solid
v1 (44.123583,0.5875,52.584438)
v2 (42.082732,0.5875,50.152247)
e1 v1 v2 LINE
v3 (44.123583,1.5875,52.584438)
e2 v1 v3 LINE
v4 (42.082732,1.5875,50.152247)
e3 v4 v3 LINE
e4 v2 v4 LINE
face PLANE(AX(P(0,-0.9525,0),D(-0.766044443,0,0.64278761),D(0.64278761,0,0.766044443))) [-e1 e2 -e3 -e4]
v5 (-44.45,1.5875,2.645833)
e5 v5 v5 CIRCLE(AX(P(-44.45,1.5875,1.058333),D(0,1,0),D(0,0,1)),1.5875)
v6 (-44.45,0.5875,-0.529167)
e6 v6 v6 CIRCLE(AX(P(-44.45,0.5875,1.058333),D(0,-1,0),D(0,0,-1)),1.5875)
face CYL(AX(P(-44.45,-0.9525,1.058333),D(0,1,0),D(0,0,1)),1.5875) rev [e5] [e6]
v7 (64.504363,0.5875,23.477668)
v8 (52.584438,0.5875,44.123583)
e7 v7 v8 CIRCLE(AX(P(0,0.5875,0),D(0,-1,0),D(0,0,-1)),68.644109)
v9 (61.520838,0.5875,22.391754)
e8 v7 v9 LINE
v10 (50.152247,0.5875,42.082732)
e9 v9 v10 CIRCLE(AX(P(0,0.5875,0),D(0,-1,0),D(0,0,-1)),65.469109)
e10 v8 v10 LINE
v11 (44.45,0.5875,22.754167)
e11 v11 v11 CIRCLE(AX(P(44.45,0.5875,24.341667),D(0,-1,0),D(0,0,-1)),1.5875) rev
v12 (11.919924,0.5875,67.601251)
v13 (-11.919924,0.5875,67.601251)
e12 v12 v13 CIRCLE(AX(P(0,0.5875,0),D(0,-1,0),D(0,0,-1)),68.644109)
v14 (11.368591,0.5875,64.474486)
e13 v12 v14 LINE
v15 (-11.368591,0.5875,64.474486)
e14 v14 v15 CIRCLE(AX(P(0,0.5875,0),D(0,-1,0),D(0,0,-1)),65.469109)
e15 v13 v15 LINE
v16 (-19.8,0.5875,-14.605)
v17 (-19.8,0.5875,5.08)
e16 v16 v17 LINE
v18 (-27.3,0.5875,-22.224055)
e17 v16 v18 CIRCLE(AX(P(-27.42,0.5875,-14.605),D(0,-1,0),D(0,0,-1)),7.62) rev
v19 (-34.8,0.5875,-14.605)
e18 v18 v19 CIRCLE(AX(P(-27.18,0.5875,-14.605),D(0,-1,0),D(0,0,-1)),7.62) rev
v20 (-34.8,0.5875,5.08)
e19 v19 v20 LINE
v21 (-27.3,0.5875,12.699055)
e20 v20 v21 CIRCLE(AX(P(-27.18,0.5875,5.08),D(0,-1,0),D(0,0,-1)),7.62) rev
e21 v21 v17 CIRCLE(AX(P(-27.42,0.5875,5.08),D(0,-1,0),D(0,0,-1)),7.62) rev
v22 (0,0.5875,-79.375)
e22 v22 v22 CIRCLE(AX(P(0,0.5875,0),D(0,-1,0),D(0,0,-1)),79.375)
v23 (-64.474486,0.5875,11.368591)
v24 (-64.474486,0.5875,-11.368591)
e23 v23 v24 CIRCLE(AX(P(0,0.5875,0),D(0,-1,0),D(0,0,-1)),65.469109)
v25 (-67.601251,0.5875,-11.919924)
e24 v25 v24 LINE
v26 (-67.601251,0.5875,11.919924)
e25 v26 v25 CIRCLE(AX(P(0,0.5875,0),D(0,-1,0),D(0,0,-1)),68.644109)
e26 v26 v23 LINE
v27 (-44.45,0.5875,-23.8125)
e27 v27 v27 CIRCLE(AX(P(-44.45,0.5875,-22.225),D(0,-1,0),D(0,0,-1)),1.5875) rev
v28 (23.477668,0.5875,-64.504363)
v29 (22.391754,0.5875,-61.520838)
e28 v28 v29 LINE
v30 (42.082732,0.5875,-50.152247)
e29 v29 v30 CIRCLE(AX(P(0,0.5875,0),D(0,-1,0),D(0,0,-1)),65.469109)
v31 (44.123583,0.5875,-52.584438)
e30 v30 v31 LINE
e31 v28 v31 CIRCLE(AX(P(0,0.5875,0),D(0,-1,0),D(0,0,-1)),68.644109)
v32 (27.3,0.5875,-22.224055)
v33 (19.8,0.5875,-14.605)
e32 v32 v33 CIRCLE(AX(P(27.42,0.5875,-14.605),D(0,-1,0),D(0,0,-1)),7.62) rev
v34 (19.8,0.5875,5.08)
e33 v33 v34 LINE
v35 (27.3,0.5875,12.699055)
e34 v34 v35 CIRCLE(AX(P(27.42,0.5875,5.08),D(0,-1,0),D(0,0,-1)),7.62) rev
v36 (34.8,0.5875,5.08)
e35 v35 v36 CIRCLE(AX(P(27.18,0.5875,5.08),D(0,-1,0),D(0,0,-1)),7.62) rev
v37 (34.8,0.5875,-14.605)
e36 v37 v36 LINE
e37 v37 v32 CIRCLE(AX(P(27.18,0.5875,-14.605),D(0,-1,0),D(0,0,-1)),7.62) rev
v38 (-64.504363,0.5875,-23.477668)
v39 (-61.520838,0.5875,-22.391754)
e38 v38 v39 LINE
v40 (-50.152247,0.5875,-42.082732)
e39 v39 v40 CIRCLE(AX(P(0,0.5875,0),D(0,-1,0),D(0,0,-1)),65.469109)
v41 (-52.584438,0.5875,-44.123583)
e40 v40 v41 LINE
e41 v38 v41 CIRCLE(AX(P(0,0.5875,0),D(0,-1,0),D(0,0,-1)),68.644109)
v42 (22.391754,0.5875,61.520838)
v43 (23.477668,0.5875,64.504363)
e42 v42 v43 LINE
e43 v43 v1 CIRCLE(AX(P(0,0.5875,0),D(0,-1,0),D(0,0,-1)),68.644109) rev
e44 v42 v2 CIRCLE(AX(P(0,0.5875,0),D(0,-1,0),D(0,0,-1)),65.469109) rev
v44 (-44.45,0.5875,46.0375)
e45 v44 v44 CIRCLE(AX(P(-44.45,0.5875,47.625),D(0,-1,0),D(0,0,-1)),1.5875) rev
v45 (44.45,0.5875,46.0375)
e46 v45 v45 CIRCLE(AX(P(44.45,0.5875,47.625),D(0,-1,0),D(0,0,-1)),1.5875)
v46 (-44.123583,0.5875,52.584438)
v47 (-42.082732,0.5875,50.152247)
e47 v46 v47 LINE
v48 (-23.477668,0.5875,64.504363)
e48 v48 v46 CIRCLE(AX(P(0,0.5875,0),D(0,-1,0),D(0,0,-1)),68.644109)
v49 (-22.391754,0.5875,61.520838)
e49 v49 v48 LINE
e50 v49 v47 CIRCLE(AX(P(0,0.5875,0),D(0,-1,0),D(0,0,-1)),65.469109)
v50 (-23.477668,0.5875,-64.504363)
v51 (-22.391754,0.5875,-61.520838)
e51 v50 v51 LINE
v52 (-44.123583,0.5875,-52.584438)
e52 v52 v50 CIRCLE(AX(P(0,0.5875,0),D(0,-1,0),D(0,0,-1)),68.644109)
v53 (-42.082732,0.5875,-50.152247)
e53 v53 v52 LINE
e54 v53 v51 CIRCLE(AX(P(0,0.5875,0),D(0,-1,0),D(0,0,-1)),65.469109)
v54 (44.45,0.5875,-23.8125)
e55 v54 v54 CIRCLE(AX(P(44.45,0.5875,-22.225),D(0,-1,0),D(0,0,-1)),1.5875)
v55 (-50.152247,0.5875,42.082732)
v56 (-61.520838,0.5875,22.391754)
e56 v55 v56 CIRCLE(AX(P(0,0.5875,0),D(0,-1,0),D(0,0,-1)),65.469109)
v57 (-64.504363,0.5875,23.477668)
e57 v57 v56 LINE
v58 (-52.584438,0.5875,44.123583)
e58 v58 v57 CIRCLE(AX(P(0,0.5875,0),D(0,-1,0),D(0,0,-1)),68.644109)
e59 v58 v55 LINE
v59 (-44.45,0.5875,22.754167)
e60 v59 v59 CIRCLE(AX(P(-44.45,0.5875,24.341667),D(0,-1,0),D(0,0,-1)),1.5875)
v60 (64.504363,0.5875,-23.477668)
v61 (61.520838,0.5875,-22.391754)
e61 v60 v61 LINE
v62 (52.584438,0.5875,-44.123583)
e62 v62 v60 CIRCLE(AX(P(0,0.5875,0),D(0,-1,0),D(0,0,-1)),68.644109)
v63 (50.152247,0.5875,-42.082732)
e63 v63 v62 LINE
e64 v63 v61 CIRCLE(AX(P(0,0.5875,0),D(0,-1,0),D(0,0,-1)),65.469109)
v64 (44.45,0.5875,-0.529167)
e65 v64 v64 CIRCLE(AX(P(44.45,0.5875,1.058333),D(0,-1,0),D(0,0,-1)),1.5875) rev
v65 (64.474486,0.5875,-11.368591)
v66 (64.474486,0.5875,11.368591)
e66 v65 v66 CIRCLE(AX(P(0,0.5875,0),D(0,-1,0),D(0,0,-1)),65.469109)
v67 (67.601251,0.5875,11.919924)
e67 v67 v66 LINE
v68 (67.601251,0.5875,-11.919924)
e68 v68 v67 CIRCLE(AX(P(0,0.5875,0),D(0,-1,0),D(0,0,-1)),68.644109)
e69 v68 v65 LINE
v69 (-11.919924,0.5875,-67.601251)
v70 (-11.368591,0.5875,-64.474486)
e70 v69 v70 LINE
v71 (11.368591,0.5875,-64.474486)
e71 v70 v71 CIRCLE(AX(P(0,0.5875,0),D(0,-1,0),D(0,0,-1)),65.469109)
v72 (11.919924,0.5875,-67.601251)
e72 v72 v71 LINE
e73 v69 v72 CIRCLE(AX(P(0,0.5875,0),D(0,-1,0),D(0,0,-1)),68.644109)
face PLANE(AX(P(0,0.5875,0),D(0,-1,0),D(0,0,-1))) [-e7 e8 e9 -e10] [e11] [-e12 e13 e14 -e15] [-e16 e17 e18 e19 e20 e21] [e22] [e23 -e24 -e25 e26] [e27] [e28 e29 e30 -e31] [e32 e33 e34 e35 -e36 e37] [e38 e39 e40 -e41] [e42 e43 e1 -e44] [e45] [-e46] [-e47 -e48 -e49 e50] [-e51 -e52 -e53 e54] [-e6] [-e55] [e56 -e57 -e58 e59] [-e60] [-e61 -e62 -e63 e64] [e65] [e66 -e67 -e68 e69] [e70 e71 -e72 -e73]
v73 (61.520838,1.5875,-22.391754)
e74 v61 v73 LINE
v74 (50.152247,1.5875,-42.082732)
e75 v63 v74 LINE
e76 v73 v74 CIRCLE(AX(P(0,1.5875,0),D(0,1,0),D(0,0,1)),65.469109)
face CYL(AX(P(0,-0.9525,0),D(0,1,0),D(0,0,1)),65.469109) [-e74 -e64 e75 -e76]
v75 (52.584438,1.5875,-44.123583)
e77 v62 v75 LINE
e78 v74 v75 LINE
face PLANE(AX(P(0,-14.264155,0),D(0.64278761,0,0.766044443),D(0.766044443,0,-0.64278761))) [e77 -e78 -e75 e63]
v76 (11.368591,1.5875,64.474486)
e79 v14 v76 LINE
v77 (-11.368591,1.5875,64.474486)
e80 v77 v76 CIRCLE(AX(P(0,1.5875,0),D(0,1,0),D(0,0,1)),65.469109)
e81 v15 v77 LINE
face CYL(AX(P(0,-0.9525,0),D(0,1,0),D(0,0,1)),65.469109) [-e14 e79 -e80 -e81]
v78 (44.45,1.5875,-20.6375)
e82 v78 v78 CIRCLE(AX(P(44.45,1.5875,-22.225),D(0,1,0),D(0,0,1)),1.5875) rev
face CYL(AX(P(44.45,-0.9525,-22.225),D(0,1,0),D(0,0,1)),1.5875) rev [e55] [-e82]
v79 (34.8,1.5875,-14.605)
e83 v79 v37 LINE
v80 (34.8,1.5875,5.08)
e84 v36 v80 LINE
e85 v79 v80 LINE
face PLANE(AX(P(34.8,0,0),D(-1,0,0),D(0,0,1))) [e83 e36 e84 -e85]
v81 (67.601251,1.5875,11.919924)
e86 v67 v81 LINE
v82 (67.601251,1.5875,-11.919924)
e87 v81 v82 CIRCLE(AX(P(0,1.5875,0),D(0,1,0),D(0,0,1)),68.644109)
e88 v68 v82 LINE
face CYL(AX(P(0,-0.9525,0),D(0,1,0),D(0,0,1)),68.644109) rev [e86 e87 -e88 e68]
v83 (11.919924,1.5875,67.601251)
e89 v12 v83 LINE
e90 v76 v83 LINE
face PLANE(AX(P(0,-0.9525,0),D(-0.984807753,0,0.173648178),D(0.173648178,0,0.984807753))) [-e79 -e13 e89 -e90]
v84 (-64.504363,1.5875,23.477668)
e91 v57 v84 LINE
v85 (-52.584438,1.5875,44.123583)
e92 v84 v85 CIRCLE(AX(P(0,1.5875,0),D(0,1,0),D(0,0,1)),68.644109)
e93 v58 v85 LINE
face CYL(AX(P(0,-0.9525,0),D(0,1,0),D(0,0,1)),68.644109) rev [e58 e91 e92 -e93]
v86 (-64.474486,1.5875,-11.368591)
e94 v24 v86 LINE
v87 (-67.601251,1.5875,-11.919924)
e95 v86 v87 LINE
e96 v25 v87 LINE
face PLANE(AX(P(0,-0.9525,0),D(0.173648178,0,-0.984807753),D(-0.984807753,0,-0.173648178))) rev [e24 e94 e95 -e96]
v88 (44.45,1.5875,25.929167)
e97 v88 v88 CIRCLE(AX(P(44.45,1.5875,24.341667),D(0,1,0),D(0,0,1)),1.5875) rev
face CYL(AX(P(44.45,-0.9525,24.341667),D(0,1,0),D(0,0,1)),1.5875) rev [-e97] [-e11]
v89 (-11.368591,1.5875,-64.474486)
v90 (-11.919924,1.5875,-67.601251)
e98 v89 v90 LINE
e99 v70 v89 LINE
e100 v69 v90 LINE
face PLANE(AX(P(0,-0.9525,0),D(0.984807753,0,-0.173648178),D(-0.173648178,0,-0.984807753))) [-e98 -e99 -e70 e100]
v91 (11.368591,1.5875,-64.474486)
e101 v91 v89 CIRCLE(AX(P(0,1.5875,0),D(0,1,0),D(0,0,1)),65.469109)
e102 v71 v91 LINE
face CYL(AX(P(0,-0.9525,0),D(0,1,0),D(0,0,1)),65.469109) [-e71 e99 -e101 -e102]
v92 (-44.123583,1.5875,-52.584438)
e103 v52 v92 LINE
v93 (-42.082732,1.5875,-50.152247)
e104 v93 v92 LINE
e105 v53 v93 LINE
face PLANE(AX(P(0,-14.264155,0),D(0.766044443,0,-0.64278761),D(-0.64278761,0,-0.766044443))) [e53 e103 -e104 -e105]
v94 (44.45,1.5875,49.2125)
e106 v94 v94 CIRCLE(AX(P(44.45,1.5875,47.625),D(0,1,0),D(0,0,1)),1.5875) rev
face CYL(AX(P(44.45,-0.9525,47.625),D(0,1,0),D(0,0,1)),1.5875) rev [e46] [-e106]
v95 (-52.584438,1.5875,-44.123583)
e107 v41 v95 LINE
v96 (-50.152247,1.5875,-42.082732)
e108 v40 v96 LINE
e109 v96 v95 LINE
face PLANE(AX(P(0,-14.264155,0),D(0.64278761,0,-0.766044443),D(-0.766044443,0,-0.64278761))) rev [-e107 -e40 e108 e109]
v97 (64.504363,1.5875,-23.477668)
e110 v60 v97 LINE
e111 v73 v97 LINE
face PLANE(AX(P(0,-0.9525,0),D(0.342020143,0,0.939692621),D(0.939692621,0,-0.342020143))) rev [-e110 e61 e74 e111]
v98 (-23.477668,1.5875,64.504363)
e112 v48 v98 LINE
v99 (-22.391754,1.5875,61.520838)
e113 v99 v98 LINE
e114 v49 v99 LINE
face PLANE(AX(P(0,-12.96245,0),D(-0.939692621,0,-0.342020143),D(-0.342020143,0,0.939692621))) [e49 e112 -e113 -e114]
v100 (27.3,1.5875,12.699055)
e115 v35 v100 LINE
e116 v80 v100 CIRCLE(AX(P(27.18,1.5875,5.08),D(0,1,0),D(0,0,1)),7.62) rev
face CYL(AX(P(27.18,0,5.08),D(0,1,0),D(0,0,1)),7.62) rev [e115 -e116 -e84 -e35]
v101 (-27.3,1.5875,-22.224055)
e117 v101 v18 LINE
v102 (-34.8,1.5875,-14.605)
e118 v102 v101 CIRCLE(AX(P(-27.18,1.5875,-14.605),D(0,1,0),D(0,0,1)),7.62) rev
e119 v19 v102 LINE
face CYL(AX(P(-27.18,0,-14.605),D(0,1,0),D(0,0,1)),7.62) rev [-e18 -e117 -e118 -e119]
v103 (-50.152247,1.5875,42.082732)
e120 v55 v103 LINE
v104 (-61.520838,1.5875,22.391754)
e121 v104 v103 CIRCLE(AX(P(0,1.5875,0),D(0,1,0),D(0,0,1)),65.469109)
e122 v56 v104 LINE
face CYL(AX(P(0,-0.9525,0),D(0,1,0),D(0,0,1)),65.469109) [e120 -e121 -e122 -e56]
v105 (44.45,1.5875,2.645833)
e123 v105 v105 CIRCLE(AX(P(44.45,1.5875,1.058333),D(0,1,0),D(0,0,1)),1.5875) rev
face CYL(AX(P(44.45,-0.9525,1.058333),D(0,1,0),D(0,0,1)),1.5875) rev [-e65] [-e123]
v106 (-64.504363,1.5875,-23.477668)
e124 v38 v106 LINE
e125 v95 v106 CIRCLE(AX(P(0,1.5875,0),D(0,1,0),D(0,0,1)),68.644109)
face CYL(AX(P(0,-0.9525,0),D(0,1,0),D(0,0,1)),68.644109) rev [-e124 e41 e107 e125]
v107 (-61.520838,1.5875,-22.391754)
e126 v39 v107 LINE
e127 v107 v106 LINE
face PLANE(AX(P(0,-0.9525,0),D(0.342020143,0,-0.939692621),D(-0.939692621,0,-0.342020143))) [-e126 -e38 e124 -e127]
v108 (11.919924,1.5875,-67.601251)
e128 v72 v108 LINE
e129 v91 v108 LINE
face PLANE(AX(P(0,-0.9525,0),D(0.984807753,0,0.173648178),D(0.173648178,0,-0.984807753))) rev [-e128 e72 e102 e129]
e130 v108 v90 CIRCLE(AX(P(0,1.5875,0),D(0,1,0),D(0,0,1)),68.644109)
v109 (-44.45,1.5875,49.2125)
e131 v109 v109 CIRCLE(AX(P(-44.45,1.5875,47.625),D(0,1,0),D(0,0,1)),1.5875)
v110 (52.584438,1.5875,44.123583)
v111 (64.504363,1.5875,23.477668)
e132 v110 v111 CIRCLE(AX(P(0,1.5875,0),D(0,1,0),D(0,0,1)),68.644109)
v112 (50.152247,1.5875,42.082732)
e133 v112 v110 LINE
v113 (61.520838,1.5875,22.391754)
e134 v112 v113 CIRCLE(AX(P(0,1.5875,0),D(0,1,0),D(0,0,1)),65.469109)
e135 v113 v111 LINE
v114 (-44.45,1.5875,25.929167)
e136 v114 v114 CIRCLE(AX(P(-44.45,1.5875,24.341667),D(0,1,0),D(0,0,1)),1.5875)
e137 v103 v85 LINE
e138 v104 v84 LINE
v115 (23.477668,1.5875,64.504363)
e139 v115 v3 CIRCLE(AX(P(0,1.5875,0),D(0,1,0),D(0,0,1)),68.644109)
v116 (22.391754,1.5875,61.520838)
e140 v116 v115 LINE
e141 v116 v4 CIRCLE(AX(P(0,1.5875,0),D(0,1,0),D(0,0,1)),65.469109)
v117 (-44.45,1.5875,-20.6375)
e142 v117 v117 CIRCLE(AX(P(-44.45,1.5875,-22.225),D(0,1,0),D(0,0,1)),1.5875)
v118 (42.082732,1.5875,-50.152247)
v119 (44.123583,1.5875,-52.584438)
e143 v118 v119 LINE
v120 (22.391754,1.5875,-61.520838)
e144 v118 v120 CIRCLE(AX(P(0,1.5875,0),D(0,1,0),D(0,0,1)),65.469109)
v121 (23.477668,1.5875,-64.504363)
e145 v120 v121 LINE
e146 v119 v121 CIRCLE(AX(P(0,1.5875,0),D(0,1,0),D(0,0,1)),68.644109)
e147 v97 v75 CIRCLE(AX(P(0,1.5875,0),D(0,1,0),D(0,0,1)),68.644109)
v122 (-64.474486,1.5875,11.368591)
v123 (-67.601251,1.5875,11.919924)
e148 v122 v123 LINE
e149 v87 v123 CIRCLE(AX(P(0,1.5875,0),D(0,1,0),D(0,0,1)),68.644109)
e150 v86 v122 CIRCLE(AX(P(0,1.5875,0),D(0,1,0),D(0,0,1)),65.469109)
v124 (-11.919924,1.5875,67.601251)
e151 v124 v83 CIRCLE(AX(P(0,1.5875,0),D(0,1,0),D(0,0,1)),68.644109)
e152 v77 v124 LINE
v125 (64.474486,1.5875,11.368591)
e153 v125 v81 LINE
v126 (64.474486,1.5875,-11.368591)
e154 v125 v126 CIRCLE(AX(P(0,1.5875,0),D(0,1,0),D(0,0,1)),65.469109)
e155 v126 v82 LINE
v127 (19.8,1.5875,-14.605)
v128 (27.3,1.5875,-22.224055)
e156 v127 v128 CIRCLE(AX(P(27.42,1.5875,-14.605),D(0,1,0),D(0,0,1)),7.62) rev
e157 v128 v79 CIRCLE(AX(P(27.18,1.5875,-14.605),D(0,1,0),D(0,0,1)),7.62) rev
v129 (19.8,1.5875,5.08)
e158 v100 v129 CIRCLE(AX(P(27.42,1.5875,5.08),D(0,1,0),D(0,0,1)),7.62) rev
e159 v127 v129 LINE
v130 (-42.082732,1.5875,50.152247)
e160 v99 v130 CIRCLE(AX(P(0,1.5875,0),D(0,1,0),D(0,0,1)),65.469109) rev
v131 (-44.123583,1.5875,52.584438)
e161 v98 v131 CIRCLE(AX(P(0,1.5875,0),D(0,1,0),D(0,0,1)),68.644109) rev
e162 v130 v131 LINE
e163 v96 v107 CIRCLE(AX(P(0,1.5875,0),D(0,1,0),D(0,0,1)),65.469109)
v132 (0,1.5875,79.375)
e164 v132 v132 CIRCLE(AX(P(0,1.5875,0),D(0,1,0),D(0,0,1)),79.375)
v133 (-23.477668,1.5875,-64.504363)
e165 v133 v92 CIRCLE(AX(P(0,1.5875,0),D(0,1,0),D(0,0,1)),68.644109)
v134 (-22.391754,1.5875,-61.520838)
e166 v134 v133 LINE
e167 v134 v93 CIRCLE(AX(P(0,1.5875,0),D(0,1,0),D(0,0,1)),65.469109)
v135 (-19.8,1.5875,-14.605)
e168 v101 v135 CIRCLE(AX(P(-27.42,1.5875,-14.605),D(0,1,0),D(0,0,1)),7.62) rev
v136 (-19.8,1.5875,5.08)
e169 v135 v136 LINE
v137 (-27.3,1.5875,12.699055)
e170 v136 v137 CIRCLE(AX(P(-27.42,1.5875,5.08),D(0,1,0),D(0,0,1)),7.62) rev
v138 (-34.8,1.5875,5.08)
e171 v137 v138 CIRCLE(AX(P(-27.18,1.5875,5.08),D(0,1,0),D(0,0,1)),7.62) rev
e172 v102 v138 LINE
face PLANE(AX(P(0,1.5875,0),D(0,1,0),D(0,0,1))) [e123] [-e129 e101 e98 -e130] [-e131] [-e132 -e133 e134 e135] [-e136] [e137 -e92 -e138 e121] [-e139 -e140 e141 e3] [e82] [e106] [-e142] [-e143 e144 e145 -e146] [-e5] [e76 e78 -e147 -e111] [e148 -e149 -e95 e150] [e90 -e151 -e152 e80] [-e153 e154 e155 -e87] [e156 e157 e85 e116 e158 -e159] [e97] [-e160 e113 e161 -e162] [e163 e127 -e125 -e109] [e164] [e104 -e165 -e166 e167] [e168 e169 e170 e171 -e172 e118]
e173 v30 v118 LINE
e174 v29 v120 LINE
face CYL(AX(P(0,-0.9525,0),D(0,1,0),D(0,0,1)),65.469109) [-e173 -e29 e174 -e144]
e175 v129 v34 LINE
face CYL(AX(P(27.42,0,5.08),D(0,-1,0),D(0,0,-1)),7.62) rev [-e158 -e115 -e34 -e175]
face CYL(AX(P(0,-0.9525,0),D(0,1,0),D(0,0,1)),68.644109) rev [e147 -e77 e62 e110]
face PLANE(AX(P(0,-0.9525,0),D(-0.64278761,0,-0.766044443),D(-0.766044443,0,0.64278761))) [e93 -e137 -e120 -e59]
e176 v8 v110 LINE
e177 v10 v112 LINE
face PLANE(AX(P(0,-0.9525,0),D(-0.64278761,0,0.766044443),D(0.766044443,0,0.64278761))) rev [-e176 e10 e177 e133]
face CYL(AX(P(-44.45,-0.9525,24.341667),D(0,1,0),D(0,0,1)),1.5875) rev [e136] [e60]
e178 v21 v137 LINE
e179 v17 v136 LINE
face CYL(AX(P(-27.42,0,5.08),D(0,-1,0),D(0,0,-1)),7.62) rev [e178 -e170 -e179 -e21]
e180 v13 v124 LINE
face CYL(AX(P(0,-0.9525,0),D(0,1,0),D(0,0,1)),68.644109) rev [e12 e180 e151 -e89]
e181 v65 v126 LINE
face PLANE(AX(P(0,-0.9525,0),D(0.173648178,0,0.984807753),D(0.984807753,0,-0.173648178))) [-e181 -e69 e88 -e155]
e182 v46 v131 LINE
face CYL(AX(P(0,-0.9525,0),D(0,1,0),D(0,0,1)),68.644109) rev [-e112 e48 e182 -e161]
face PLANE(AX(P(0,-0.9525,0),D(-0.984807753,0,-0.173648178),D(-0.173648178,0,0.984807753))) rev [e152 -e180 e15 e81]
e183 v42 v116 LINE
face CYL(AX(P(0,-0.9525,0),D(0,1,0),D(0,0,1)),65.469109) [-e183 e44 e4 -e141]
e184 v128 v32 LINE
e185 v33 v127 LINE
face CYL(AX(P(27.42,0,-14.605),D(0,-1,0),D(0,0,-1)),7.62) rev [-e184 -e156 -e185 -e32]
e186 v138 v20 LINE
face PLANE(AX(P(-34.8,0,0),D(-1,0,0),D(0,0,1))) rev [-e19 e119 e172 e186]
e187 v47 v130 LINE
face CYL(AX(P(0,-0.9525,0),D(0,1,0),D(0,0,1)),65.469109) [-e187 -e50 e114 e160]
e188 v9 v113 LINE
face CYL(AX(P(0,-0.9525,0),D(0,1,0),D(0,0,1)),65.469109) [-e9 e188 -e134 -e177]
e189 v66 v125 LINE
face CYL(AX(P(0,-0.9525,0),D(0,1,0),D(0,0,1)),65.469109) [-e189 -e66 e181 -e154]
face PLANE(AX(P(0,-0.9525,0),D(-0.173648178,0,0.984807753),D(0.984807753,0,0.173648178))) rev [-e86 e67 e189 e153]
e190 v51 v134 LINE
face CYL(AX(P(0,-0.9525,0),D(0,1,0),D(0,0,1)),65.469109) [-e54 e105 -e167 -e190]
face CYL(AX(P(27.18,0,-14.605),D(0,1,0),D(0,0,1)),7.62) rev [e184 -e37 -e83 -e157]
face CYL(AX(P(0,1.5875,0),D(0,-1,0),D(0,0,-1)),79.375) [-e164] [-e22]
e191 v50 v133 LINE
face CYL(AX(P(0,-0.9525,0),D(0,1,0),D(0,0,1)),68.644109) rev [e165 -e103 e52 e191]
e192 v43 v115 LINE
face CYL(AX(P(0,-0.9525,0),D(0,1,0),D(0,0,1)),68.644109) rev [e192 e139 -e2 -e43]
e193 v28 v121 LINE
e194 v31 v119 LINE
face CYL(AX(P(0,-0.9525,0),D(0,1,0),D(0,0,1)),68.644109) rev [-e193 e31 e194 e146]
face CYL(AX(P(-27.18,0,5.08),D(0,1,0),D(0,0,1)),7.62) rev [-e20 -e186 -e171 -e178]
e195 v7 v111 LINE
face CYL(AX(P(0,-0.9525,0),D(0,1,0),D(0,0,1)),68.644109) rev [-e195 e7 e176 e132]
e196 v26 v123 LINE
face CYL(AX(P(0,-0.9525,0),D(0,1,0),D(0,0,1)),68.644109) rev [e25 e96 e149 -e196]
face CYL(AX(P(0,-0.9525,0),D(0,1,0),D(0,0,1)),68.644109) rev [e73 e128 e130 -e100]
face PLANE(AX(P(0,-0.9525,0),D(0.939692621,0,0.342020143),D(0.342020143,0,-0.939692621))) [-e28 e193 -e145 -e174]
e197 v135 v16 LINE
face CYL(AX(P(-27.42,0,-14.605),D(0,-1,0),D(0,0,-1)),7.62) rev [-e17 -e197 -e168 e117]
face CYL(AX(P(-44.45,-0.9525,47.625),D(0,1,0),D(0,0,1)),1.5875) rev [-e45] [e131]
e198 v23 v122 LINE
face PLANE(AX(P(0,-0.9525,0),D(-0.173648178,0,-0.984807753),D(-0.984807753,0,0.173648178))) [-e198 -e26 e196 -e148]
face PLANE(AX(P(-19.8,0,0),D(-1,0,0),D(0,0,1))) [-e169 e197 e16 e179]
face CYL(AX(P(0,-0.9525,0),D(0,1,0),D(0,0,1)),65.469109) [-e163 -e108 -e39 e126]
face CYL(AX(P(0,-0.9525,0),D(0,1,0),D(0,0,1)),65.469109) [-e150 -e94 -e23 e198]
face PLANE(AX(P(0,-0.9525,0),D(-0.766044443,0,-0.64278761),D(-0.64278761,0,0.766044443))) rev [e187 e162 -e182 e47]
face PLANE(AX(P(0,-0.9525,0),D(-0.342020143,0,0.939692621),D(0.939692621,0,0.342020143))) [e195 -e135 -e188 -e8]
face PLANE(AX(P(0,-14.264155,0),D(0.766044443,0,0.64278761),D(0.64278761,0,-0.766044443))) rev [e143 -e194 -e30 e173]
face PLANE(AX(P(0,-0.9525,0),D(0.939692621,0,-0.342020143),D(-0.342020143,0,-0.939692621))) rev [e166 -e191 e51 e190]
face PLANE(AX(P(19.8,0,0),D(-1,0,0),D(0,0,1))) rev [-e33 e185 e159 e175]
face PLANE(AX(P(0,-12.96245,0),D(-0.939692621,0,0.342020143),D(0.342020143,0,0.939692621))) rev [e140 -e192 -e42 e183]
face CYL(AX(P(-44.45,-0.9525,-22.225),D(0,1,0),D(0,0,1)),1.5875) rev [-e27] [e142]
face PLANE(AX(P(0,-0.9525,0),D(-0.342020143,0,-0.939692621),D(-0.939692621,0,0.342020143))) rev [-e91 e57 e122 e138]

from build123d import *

# Parameters (mm, degrees)
SKETCH1_R            = 1.5875
BOSS_EXTRUDE5_DEPTH  = 1.5875
FILLET2_R            = 2.54
FILLET3_R            = 2.54
FILLET4_R            = 5.08
CUT_EXTRUDE1_START   = -2.54
SKETCH2_R            = 2.38125
SKETCH2_R_2          = 1.5875
CUT_EXTRUDE1_DEPTH   = 2.54
SKETCH3_R            = 1.5875
CUT_EXTRUDE2_DEPTH   = 2.54
CUT_EXTRUDE3_DEPTH   = 2.54
SKETCH5_W            = 15
SKETCH5_H            = 34.925
CUT_EXTRUDE4_DEPTH   = 109.650407999
FILLET5_R            = 7.62
FILLET6_R            = 7.62
BOSS_EXTRUDE6_START  = -1.5875
BOSS_EXTRUDE6_DEPTH  = 1.5875
SKETCH7_R            = 79.375
CUT_EXTRUDE5_DEPTH   = 0.5875
BOSS_EXTRUDE7_START  = -1
SKETCH8_R            = 1.5875
SKETCH8_R_2          = 2.38125
BOSS_EXTRUDE7_DEPTH  = 1
SKETCH9_R            = 1.5875
CUT_EXTRUDE7_DEPTH   = 2.54
BOSS_EXTRUDE8_START  = -1
BOSS_EXTRUDE8_DEPTH  = 1
CUT_EXTRUDE9_START   = -2.54
CUT_EXTRUDE9_DEPTH   = 2.54
BOSS_EXTRUDE9_START  = -1
BOSS_EXTRUDE9_DEPTH  = 1
CUT_EXTRUDE10_START  = -2.54
CUT_EXTRUDE10_DEPTH  = 2.54
BOSS_EXTRUDE10_START = -1
BOSS_EXTRUDE10_DEPTH = 1
CUT_EXTRUDE11_START  = -2.54
CUT_EXTRUDE11_DEPTH  = 2.54
BOSS_EXTRUDE11_START = -1
BOSS_EXTRUDE11_DEPTH = 1


with BuildPart() as part:
    # Sketch1 → Boss-Extrude5 (new body)
    with BuildSketch(Plane(origin=(0, 0, 0), x_dir=(1, 0, 0), z_dir=(0, 1, 0))):
        with BuildLine():
            ThreePointArc((-63.5, -47.625), (-35.497579143, -70.995158286), (0, -79.375))
            ThreePointArc((0, -79.375), (35.497579143, -70.995158286), (63.5, -47.625))
            Line((63.5, -47.625), (50.8, -47.625))
            Line((50.8, -47.625), (50.8, 22.225))
            Line((50.8, 22.225), (76.2, 22.225))
            ThreePointArc((76.2, 22.225), (0, 79.375), (-76.2, 22.225))
            Line((-76.2, 22.225), (-50.8, 22.225))
            Line((-50.8, 22.225), (-50.8, -47.625))
            Line((-50.8, -47.625), (-63.5, -47.625))
        make_face()
        with Locations(Location((-7.14375, -66.675, 0), (0, 0, 270))):
            Circle(SKETCH1_R, mode=Mode.SUBTRACT)
        with BuildLine():
            ThreePointArc((8.73125, -66.675), (7.14375, -68.2625), (5.55625, -66.675))
            ThreePointArc((5.55625, -66.675), (7.14375, -65.0875), (8.73125, -66.675))
        make_face(mode=Mode.SUBTRACT)
        with Locations(Location((-7.14375, 66.675, 0), (0, 0, 270))):
            Circle(SKETCH1_R, mode=Mode.SUBTRACT)
        with Locations(Location((7.14375, 66.675, 0), (0, 0, 270))):
            Circle(SKETCH1_R, mode=Mode.SUBTRACT)
    extrude(amount=BOSS_EXTRUDE5_DEPTH)

    # Fillet2
    fillet2_edges = [part.edges().sort_by_distance(p)[0] for p in [
        (-63.5, 0.79375, 47.625),
    ]]
    fillet(fillet2_edges, radius=FILLET2_R)

    # Fillet3
    fillet3_edges = [part.edges().sort_by_distance(p)[0] for p in [
        (63.5, 0.79375, 47.625),
    ]]
    fillet(fillet3_edges, radius=FILLET3_R)

    # Fillet4
    fillet4_edges = [part.edges().sort_by_distance(p)[0] for p in [
        (-76.2, 0.79375, -22.225),
        (76.2, 0.79375, -22.225),
    ]]
    fillet(fillet4_edges, radius=FILLET4_R)

    # Sketch2 → Cut-Extrude1 (cut)
    # profile 1 of 10: a face of its own
    with BuildSketch(Plane(origin=(0, 1.5875, 0), x_dir=(1, 0, 0), z_dir=(0, 1, 0)).offset(CUT_EXTRUDE1_START)):
        with BuildLine():
            Line((-61.088622125, 27.654457796), (-59.642408406, 26.999765402))
            ThreePointArc((-59.642408406, 26.999765402), (-52.384826382, 39.268743005), (-42.643785254, 49.676068599))
            Line((-42.643785254, 49.676068599), (-43.677815048, 50.880617741))
            Line((-43.677815048, 50.880617741), (-44.711844841, 52.085166883))
            ThreePointArc((-44.711844841, 52.085166883), (-54.925289002, 41.173126022), (-62.534835843, 28.309150189))
            Line((-62.534835843, 28.309150189), (-61.088622125, 27.654457796))
        make_face()
    # profile 2 of 10: a face of its own
    with BuildSketch(Plane(origin=(0, 1.5875, 0), x_dir=(1, 0, 0), z_dir=(0, 1, 0)).offset(CUT_EXTRUDE1_START)):
        with BuildLine():
            Line((-39.077069744, 54.493774041), (-38.151958122, 53.203686937))
            ThreePointArc((-38.151958122, 53.203686937), (-25.732218917, 60.200142208), (-12.092567045, 64.342629994))
            Line((-12.092567045, 64.342629994), (-12.385788543, 65.902815048))
            Line((-12.385788543, 65.902815048), (-12.679010041, 67.463000102))
            ThreePointArc((-12.679010041, 67.463000102), (-26.980132574, 63.119617589), (-40.002181367, 55.783861145))
            Line((-40.002181367, 55.783861145), (-39.077069744, 54.493774041))
        make_face()
    # profile 3 of 10: a face of its own
    with BuildSketch(Plane(origin=(0, 1.5875, 0), x_dir=(1, 0, 0), z_dir=(0, 1, 0)).offset(CUT_EXTRUDE1_START)):
        with Locations(Location((-7.14375, 66.675, 0), (0, 0, 270))):
            Circle(SKETCH2_R)
        with Locations((-7.14375, 66.675)):
            Circle(SKETCH2_R_2, mode=Mode.SUBTRACT)
    # profile 4 of 10: a face of its own
    with BuildSketch(Plane(origin=(0, 1.5875, 0), x_dir=(1, 0, 0), z_dir=(0, 1, 0)).offset(CUT_EXTRUDE1_START)):
        with Locations(Location((7.14375, 66.675, 0), (0, 0, 270))):
            Circle(SKETCH2_R)
        with Locations((7.14375, 66.675)):
            Circle(SKETCH2_R_2, mode=Mode.SUBTRACT)
    # profile 5 of 10: a face of its own
    with BuildSketch(Plane(origin=(0, 1.5875, 0), x_dir=(1, 0, 0), z_dir=(0, 1, 0)).offset(CUT_EXTRUDE1_START)):
        with BuildLine():
            ThreePointArc((12.679010041, 67.463000102), (26.980132574, 63.119617589), (40.002181367, 55.783861145))
            Line((40.002181367, 55.783861145), (39.077069744, 54.493774041))
            Line((39.077069744, 54.493774041), (38.151958122, 53.203686937))
            ThreePointArc((38.151958122, 53.203686937), (25.732218917, 60.200142208), (12.092567045, 64.342629994))
            Line((12.092567045, 64.342629994), (12.385788543, 65.902815048))
            Line((12.385788543, 65.902815048), (12.679010041, 67.463000102))
        make_face()
    # profile 6 of 10: a face of its own
    with BuildSketch(Plane(origin=(0, 1.5875, 0), x_dir=(1, 0, 0), z_dir=(0, 1, 0)).offset(CUT_EXTRUDE1_START)):
        with BuildLine():
            ThreePointArc((44.711844841, 52.085166883), (54.925289002, 41.173126022), (62.534835843, 28.309150189))
            Line((62.534835843, 28.309150189), (59.642408406, 26.999765402))
            ThreePointArc((59.642408406, 26.999765402), (52.384826382, 39.268743005), (42.643785254, 49.676068599))
            Line((42.643785254, 49.676068599), (43.677815048, 50.880617741))
            Line((43.677815048, 50.880617741), (44.711844841, 52.085166883))
        make_face()
    # profile 7 of 10: a face of its own
    with BuildSketch(Plane(origin=(0, 1.5875, 0), x_dir=(1, 0, 0), z_dir=(0, 1, 0)).offset(CUT_EXTRUDE1_START)):
        with BuildLine():
            ThreePointArc((-12.679010041, -67.463000102), (-26.980132574, -63.119617589), (-40.002181367, -55.783861145))
            Line((-40.002181367, -55.783861145), (-39.077069744, -54.493774041))
            Line((-39.077069744, -54.493774041), (-38.151958122, -53.203686937))
            ThreePointArc((-38.151958122, -53.203686937), (-25.732218917, -60.200142208), (-12.092567045, -64.342629994))
            Line((-12.092567045, -64.342629994), (-12.385788543, -65.902815048))
            Line((-12.385788543, -65.902815048), (-12.679010041, -67.463000102))
        make_face()
    # profile 8 of 10: a face of its own
    with BuildSketch(Plane(origin=(0, 1.5875, 0), x_dir=(1, 0, 0), z_dir=(0, 1, 0)).offset(CUT_EXTRUDE1_START)):
        with Locations(Location((-7.14375, -66.675, 0), (0, 0, 270))):
            Circle(SKETCH2_R)
        with Locations((-7.14375, -66.675)):
            Circle(SKETCH2_R_2, mode=Mode.SUBTRACT)
    # profile 9 of 10: a face of its own
    with BuildSketch(Plane(origin=(0, 1.5875, 0), x_dir=(1, 0, 0), z_dir=(0, 1, 0)).offset(CUT_EXTRUDE1_START)):
        with Locations(Location((7.14375, -66.675, 0), (0, 0, 270))):
            Circle(SKETCH2_R)
        with Locations((7.14375, -66.675)):
            Circle(SKETCH2_R_2, mode=Mode.SUBTRACT)
    # profile 10 of 10: a face of its own
    with BuildSketch(Plane(origin=(0, 1.5875, 0), x_dir=(1, 0, 0), z_dir=(0, 1, 0)).offset(CUT_EXTRUDE1_START)):
        with BuildLine():
            ThreePointArc((12.092567045, -64.342629994), (25.732218917, -60.200142208), (38.151958122, -53.203686937))
            Line((38.151958122, -53.203686937), (39.077069744, -54.493774041))
            Line((39.077069744, -54.493774041), (40.002181367, -55.783861145))
            ThreePointArc((40.002181367, -55.783861145), (26.980132574, -63.119617589), (12.679010041, -67.463000102))
            Line((12.679010041, -67.463000102), (12.385788543, -65.902815048))
            Line((12.385788543, -65.902815048), (12.092567045, -64.342629994))
        make_face()
    extrude(amount=CUT_EXTRUDE1_DEPTH, mode=Mode.SUBTRACT)

    # Sketch3 → Cut-Extrude2 (cut)
    with BuildSketch(Plane(origin=(0, 1.5875, 0), x_dir=(1, 0, 0), z_dir=(0, 1, 0))):
        with Locations(Location((-44.45, -47.625, 0), (0, 0, 270))):
            Circle(SKETCH3_R)
        with Locations(Location((-44.45, 22.225, 0), (0, 0, 270))):
            Circle(SKETCH3_R)
        with Locations(Location((44.45, 22.225, 0), (0, 0, 270))):
            Circle(SKETCH3_R)
        with Locations(Location((44.45, -47.625, 0), (0, 0, 270))):
            Circle(SKETCH3_R)
    extrude(amount=-CUT_EXTRUDE2_DEPTH, mode=Mode.SUBTRACT)

    # Sketch4 → Cut-Extrude3 (cut)
    with BuildSketch(Plane(origin=(0, 1.5875, 0), x_dir=(1, 0, 0), z_dir=(0, 1, 0))):
        with BuildLine():
            ThreePointArc((-44.45, -11.1125), (-46.0375, -12.7), (-44.45, -14.2875))
            Line((-44.45, -14.2875), (-44.45, -11.1125))
        make_face()
        with BuildLine():
            Line((-44.45, -11.1125), (-44.45, -14.2875))
            ThreePointArc((-44.45, -14.2875), (-43.327467985, -13.822532015), (-42.8625, -12.7))
            ThreePointArc((-42.8625, -12.7), (-43.327467985, -11.577467985), (-44.45, -11.1125))
        make_face()
        with BuildLine():
            ThreePointArc((44.45, -11.1125), (42.8625, -12.7), (44.45, -14.2875))
            Line((44.45, -14.2875), (44.45, -11.1125))
        make_face()
        with BuildLine():
            Line((44.45, -11.1125), (44.45, -14.2875))
            ThreePointArc((44.45, -14.2875), (45.572532015, -13.822532015), (46.0375, -12.7))
            ThreePointArc((46.0375, -12.7), (45.572532015, -11.577467985), (44.45, -11.1125))
        make_face()
    extrude(amount=-CUT_EXTRUDE3_DEPTH, mode=Mode.SUBTRACT)

    # Sketch5 → Cut-Extrude4 (cut, through all)
    with BuildSketch(Plane(origin=(0, 1.5875, 0), x_dir=(1, 0, 0), z_dir=(0, 1, 0))):
        with Locations((-27.3, 4.7625)):
            Rectangle(SKETCH5_W, SKETCH5_H)
        with Locations((27.3, 4.7625)):
            Rectangle(SKETCH5_W, SKETCH5_H)
    extrude(amount=-CUT_EXTRUDE4_DEPTH, mode=Mode.SUBTRACT)

    # Fillet5
    # the kernel refuses this fillet: 7.62 mm, written as the material it adds along each edge
    with BuildSketch(Plane(origin=(-19.8, 1.5875, 12.7), x_dir=(0, 0, -1), z_dir=(0, -1, 0))) as fillet5_piece_1:
        with BuildLine():
            CenterArc((FILLET5_R, -FILLET5_R), FILLET5_R, 90, 90)
            Line((0, -FILLET5_R), (0, 0))
            Line((0, 0), (FILLET5_R, 0))
        make_face()
    extrude(amount=1.5875)
    with BuildSketch(Plane(origin=(-34.8, 1.5875, 12.7), x_dir=(0, 0, -1), z_dir=(0, -1, 0)), Plane(origin=(-19.8, 1.5875, -22.225), x_dir=(0, 0, 1), z_dir=(0, -1, 0)), Plane(origin=(-34.8, 1.5875, -22.225), x_dir=(1, 0, 0), z_dir=(0, -1, 0))) as fillet5_piece_2:
        with BuildLine():
            CenterArc((FILLET5_R, FILLET5_R), FILLET5_R, 180, 90)
            Line((0, FILLET5_R), (0, 0))
            Line((0, 0), (FILLET5_R, 0))
        make_face()
    extrude(amount=1.5875)

    # Fillet6
    # the kernel refuses this fillet: 7.62 mm, written as the material it adds along each edge
    with BuildSketch(Plane(origin=(34.8, 1.5875, 12.7), x_dir=(0, 0, -1), z_dir=(0, -1, 0)), Plane(origin=(34.8, 1.5875, -22.225), x_dir=(-1, 0, 0), z_dir=(0, -1, 0))) as fillet6_piece_1:
        with BuildLine():
            CenterArc((FILLET6_R, -FILLET6_R), FILLET6_R, 90, 90)
            Line((0, -FILLET6_R), (0, 0))
            Line((0, 0), (FILLET6_R, 0))
        make_face()
    extrude(amount=1.5875)
    with BuildSketch(Plane(origin=(19.8, 1.5875, -22.225), x_dir=(1, 0, 0), z_dir=(0, -1, 0)), Plane(origin=(19.8, 1.5875, 12.7), x_dir=(0, 0, -1), z_dir=(0, -1, 0))) as fillet6_piece_2:
        with BuildLine():
            CenterArc((FILLET6_R, FILLET6_R), FILLET6_R, 180, 90)
            Line((0, FILLET6_R), (0, 0))
            Line((0, 0), (FILLET6_R, 0))
        make_face()
    extrude(amount=1.5875)

    # Sketch6 → Boss-Extrude6 (add)
    with BuildSketch(Plane(origin=(0, 1.5875, 0), x_dir=(1, 0, 0), z_dir=(0, 1, 0)).offset(BOSS_EXTRUDE6_START)):
        with BuildLine():
            Line((-50.8, -60.989758362), (-50.8, 22.225))
            Line((-50.8, 22.225), (-69.095470184, 22.225))
            Line((-69.095470184, 22.225), (-69.095470184, 39.066694575))
            ThreePointArc((-69.095470184, 39.066694575), (-78.080435361, -14.277122916), (-50.8, -60.989758362))
        make_face()
        with BuildLine():
            Line((50.8, 22.225), (50.8, -60.989758362))
            ThreePointArc((50.8, -60.989758362), (71.877119534, -33.675960454), (79.375, 0))
            ThreePointArc((79.375, 0), (76.762111653, 20.198238526), (69.095470184, 39.066694575))
            Line((69.095470184, 39.066694575), (69.095470184, 22.225))
            Line((69.095470184, 22.225), (50.8, 22.225))
        make_face()
    extrude(amount=BOSS_EXTRUDE6_DEPTH)

    # Sketch7 → Cut-Extrude5 (cut)
    with BuildSketch(Plane.XZ):
        with Locations(Location((0, 0, 0), (0, 0, 270))):
            Circle(SKETCH7_R)
    extrude(amount=-CUT_EXTRUDE5_DEPTH, mode=Mode.SUBTRACT)

    # Sketch8 → Boss-Extrude7 (add)
    with BuildSketch(Plane(origin=(0, 1.5875, 0), x_dir=(1, 0, 0), z_dir=(0, 1, 0)).offset(BOSS_EXTRUDE7_START)):
        with Locations((-44.45, -12.7)):
            Circle(SKETCH8_R)
        with Locations((44.45, -12.7)):
            Circle(SKETCH8_R)
        with Locations((-7.14375, -66.675)):
            Circle(SKETCH8_R_2)
        with Locations((7.14375, -66.675)):
            Circle(SKETCH8_R_2)
        with Locations((-7.14375, 66.675)):
            Circle(SKETCH8_R_2)
        with Locations((7.14375, 66.675)):
            Circle(SKETCH8_R_2)
    extrude(amount=BOSS_EXTRUDE7_DEPTH)

    # Sketch9 → Cut-Extrude7 (cut)
    with BuildSketch(Plane(origin=(0, 1.5875, 0), x_dir=(1, 0, 0), z_dir=(0, 1, 0))):
        with Locations(Location((-44.45, -1.058333333, 0), (0, 0, 270))):
            Circle(SKETCH9_R)
        with Locations(Location((-44.45, -24.341666667, 0), (0, 0, 270))):
            Circle(SKETCH9_R)
        with Locations(Location((44.45, -24.341666667, 0), (0, 0, 270))):
            Circle(SKETCH9_R)
        with Locations(Location((44.45, -1.058333333, 0), (0, 0, 270))):
            Circle(SKETCH9_R)
    extrude(amount=-CUT_EXTRUDE7_DEPTH, mode=Mode.SUBTRACT)

    # Sketch10 → Boss-Extrude8 (add)
    with BuildSketch(Plane(origin=(0, 1.5875, 0), x_dir=(1, 0, 0), z_dir=(0, 1, 0)).offset(BOSS_EXTRUDE8_START)):
        with BuildLine():
            Line((-44.711844841, 52.085166883), (-42.643785254, 49.676068599))
            ThreePointArc((-42.643785254, 49.676068599), (-52.384826382, 39.268743005), (-59.642408406, 26.999765402))
            Line((-59.642408406, 26.999765402), (-62.534835843, 28.309150189))
            ThreePointArc((-62.534835843, 28.309150189), (-54.925289002, 41.173126022), (-44.711844841, 52.085166883))
        make_face()
        with BuildLine():
            Line((-12.679010041, 67.463000102), (-12.092567045, 64.342629994))
            ThreePointArc((-12.092567045, 64.342629994), (-25.732218917, 60.200142208), (-38.151958122, 53.203686937))
            Line((-38.151958122, 53.203686937), (-40.002181367, 55.783861145))
            ThreePointArc((-40.002181367, 55.783861145), (-26.980132574, 63.119617589), (-12.679010041, 67.463000102))
        make_face()
        with BuildLine():
            Line((12.092567045, 64.342629994), (12.679010041, 67.463000102))
            ThreePointArc((12.679010041, 67.463000102), (26.980132574, 63.119617589), (40.002181367, 55.783861145))
            Line((40.002181367, 55.783861145), (38.151958122, 53.203686937))
            ThreePointArc((38.151958122, 53.203686937), (25.732218917, 60.200142208), (12.092567045, 64.342629994))
        make_face()
        with BuildLine():
            Line((42.643785254, 49.676068599), (44.711844841, 52.085166883))
            ThreePointArc((44.711844841, 52.085166883), (54.925289002, 41.173126022), (62.534835843, 28.309150189))
            Line((62.534835843, 28.309150189), (59.642408406, 26.999765402))
            ThreePointArc((59.642408406, 26.999765402), (52.384826382, 39.268743005), (42.643785254, 49.676068599))
        make_face()
    extrude(amount=BOSS_EXTRUDE8_DEPTH)

    # Sketch11 → Cut-Extrude9 (cut)
    with BuildSketch(Plane(origin=(0, 1.5875, 0), x_dir=(1, 0, 0), z_dir=(0, 1, 0)).offset(CUT_EXTRUDE9_START)):
        with BuildLine():
            Line((11.919924408, -67.601250584), (11.368591443, -64.474485968))
            ThreePointArc((11.368591443, -64.474485968), (0, -65.46910884), (-11.368591443, -64.474485968))
            Line((-11.368591443, -64.474485968), (-11.919924408, -67.601250584))
            ThreePointArc((-11.919924408, -67.601250584), (0, -68.64410884), (11.919924408, -67.601250584))
        make_face()
        with BuildLine():
            Line((-11.919924408, 67.601250584), (-11.368591443, 64.474485968))
            ThreePointArc((-11.368591443, 64.474485968), (0, 65.46910884), (11.368591443, 64.474485968))
            Line((11.368591443, 64.474485968), (11.919924408, 67.601250584))
            ThreePointArc((11.919924408, 67.601250584), (0, 68.64410884), (-11.919924408, 67.601250584))
        make_face()
        with BuildLine():
            Line((-48.538714849, 48.538714849), (-46.293650819, 46.293650819))
            ThreePointArc((-46.293650819, 46.293650819), (-42.082731979, 50.152247023), (-37.551538139, 53.629154344))
            Line((-37.551538139, 53.629154344), (-39.372643325, 56.229962084))
            ThreePointArc((-39.372643325, 56.229962084), (-44.12358264, 52.584438129), (-48.538714849, 48.538714849))
        make_face()
        with BuildLine():
            ThreePointArc((-53.629154344, 37.551538139), (-50.152247023, 42.082731979), (-46.293650819, 46.293650819))
            Line((-46.293650819, 46.293650819), (-48.538714849, 48.538714849))
            ThreePointArc((-48.538714849, 48.538714849), (-52.584438129, 44.12358264), (-56.229962084, 39.372643325))
            Line((-56.229962084, 39.372643325), (-53.629154344, 37.551538139))
        make_face()
        with BuildLine():
            Line((-68.64410884, 0), (-65.46910884, 0))
            ThreePointArc((-65.46910884, 0), (-65.219979115, 5.706008808), (-64.474485968, 11.368591443))
            Line((-64.474485968, 11.368591443), (-67.601250584, 11.919924408))
            ThreePointArc((-67.601250584, 11.919924408), (-68.382897281, 5.982728291), (-68.64410884, 0))
        make_face()
        with BuildLine():
            ThreePointArc((-64.474485968, -11.368591443), (-65.219979115, -5.706008808), (-65.46910884, 0))
            Line((-65.46910884, 0), (-68.64410884, 0))
            ThreePointArc((-68.64410884, 0), (-68.382897281, -5.982728291), (-67.601250584, -11.919924408))
            Line((-67.601250584, -11.919924408), (-64.474485968, -11.368591443))
        make_face()
        with BuildLine():
            Line((67.601250584, 11.919924408), (64.474485968, 11.368591443))
            ThreePointArc((64.474485968, 11.368591443), (65.219979115, 5.706008808), (65.46910884, 0))
            ThreePointArc((65.46910884, 0), (65.219979115, -5.706008808), (64.474485968, -11.368591443))
            Line((64.474485968, -11.368591443), (67.601250584, -11.919924408))
            ThreePointArc((67.601250584, -11.919924408), (68.382897281, -5.982728291), (68.64410884, 0))
            ThreePointArc((68.64410884, 0), (68.382897281, 5.982728291), (67.601250584, 11.919924408))
        make_face()
        with BuildLine():
            Line((48.538714849, 48.538714849), (46.293650819, 46.293650819))
            ThreePointArc((46.293650819, 46.293650819), (50.152247023, 42.082731979), (53.629154344, 37.551538139))
            Line((53.629154344, 37.551538139), (56.229962084, 39.372643325))
            ThreePointArc((56.229962084, 39.372643325), (52.584438129, 44.12358264), (48.538714849, 48.538714849))
        make_face()
        with BuildLine():
            ThreePointArc((37.551538139, 53.629154344), (42.082731979, 50.152247023), (46.293650819, 46.293650819))
            Line((46.293650819, 46.293650819), (48.538714849, 48.538714849))
            ThreePointArc((48.538714849, 48.538714849), (44.12358264, 52.584438129), (39.372643325, 56.229962084))
            Line((39.372643325, 56.229962084), (37.551538139, 53.629154344))
        make_face()
    extrude(amount=CUT_EXTRUDE9_DEPTH, mode=Mode.SUBTRACT)

    # Sketch12 → Boss-Extrude9 (add)
    with BuildSketch(Plane(origin=(0, 1.5875, 0), x_dir=(1, 0, 0), z_dir=(0, 1, 0)).offset(BOSS_EXTRUDE9_START)):
        with BuildLine():
            ThreePointArc((-12.092567045, -64.342629994), (-14.887643702, -63.753919701), (-17.654380884, -63.043850199))
            Line((-17.654380884, -63.043850199), (-18.510550462, -66.101234482))
            ThreePointArc((-18.510550462, -66.101234482), (-15.609637167, -66.845739624), (-12.679010041, -67.463000102))
            Line((-12.679010041, -67.463000102), (-12.092567045, -64.342629994))
        make_face()
        with BuildLine():
            Line((18.510550462, -66.101234482), (17.654380884, -63.043850199))
            ThreePointArc((17.654380884, -63.043850199), (14.887643702, -63.753919701), (12.092567045, -64.342629994))
            Line((12.092567045, -64.342629994), (12.679010041, -67.463000102))
            ThreePointArc((12.679010041, -67.463000102), (15.609637167, -66.845739624), (18.510550462, -66.101234482))
        make_face()
    extrude(amount=BOSS_EXTRUDE9_DEPTH)

    # Sketch13 → Cut-Extrude10 (cut)
    with BuildSketch(Plane(origin=(0, 1.5875, 0), x_dir=(1, 0, 0), z_dir=(0, 1, 0)).offset(CUT_EXTRUDE10_START)):
        with BuildLine():
            Line((-52.584438129, -44.12358264), (-50.152247023, -42.082731979))
            ThreePointArc((-50.152247023, -42.082731979), (-56.697911418, -32.73455442), (-61.520838466, -22.391753989))
            Line((-61.520838466, -22.391753989), (-64.504362537, -23.477667944))
            ThreePointArc((-64.504362537, -23.477667944), (-59.447542075, -34.32205442), (-52.584438129, -44.12358264))
        make_face()
        with BuildLine():
            Line((64.504362537, -23.477667944), (61.520838466, -22.391753989))
            ThreePointArc((61.520838466, -22.391753989), (56.697911418, -32.73455442), (50.152247023, -42.082731979))
            Line((50.152247023, -42.082731979), (52.584438129, -44.12358264))
            ThreePointArc((52.584438129, -44.12358264), (59.447542075, -34.32205442), (64.504362537, -23.477667944))
        make_face()
        with BuildLine():
            Line((52.584438129, 44.12358264), (50.152247023, 42.082731979))
            ThreePointArc((50.152247023, 42.082731979), (56.697911418, 32.73455442), (61.520838466, 22.391753989))
            Line((61.520838466, 22.391753989), (64.504362537, 23.477667944))
            ThreePointArc((64.504362537, 23.477667944), (59.447542075, 34.32205442), (52.584438129, 44.12358264))
        make_face()
        with BuildLine():
            Line((23.477667944, 64.504362537), (22.391753989, 61.520838466))
            ThreePointArc((22.391753989, 61.520838466), (32.73455442, 56.697911418), (42.082731979, 50.152247023))
            Line((42.082731979, 50.152247023), (44.12358264, 52.584438129))
            ThreePointArc((44.12358264, 52.584438129), (34.32205442, 59.447542075), (23.477667944, 64.504362537))
        make_face()
        with BuildLine():
            Line((-44.12358264, 52.584438129), (-42.082731979, 50.152247023))
            ThreePointArc((-42.082731979, 50.152247023), (-32.73455442, 56.697911418), (-22.391753989, 61.520838466))
            Line((-22.391753989, 61.520838466), (-23.477667944, 64.504362537))
            ThreePointArc((-23.477667944, 64.504362537), (-34.32205442, 59.447542075), (-44.12358264, 52.584438129))
        make_face()
        with BuildLine():
            Line((-64.504362537, 23.477667944), (-61.520838466, 22.391753989))
            ThreePointArc((-61.520838466, 22.391753989), (-56.697911418, 32.73455442), (-50.152247023, 42.082731979))
            Line((-50.152247023, 42.082731979), (-52.584438129, 44.12358264))
            ThreePointArc((-52.584438129, 44.12358264), (-59.447542075, 34.32205442), (-64.504362537, 23.477667944))
        make_face()
    extrude(amount=CUT_EXTRUDE10_DEPTH, mode=Mode.SUBTRACT)

    # Sketch15 → Boss-Extrude10 (add)
    with BuildSketch(Plane(origin=(0, 1.5875, 0), x_dir=(1, 0, 0), z_dir=(0, 1, 0)).offset(BOSS_EXTRUDE10_START)):
        with BuildLine():
            Line((-52.584438129, 44.12358264), (-50.152247023, 42.082731979))
            ThreePointArc((-50.152247023, 42.082731979), (-46.293650819, 46.293650819), (-42.082731979, 50.152247023))
            Line((-42.082731979, 50.152247023), (-44.12358264, 52.584438129))
            ThreePointArc((-44.12358264, 52.584438129), (-48.538714849, 48.538714849), (-52.584438129, 44.12358264))
        make_face()
        with BuildLine():
            Line((44.12358264, 52.584438129), (42.082731979, 50.152247023))
            ThreePointArc((42.082731979, 50.152247023), (46.293650819, 46.293650819), (50.152247023, 42.082731979))
            Line((50.152247023, 42.082731979), (52.584438129, 44.12358264))
            ThreePointArc((52.584438129, 44.12358264), (48.538714849, 48.538714849), (44.12358264, 52.584438129))
        make_face()
    extrude(amount=BOSS_EXTRUDE10_DEPTH)

    # Sketch16 → Cut-Extrude11 (cut)
    with BuildSketch(Plane(origin=(0, 1.5875, 0), x_dir=(1, 0, 0), z_dir=(0, 1, 0)).offset(CUT_EXTRUDE11_START)):
        with BuildLine():
            Line((-23.477667944, -64.504362537), (-22.391753989, -61.520838466))
            ThreePointArc((-22.391753989, -61.520838466), (-32.73455442, -56.697911418), (-42.082731979, -50.152247022))
            Line((-42.082731979, -50.152247022), (-44.12358264, -52.584438129))
            ThreePointArc((-44.12358264, -52.584438129), (-34.32205442, -59.447542075), (-23.477667944, -64.504362537))
        make_face()
        with BuildLine():
            ThreePointArc((42.082731979, -50.152247022), (32.73455442, -56.697911418), (22.391753989, -61.520838466))
            Line((22.391753989, -61.520838466), (23.477667944, -64.504362537))
            ThreePointArc((23.477667944, -64.504362537), (34.32205442, -59.447542075), (44.12358264, -52.584438129))
            Line((44.12358264, -52.584438129), (42.082731979, -50.152247022))
        make_face()
    extrude(amount=CUT_EXTRUDE11_DEPTH, mode=Mode.SUBTRACT)

    # Sketch17 → Boss-Extrude11 (add)
    with BuildSketch(Plane(origin=(0, 1.5875, 0), x_dir=(1, 0, 0), z_dir=(0, 1, 0)).offset(BOSS_EXTRUDE11_START)):
        with BuildLine():
            Line((-11.919924408, -67.601250584), (-11.368591443, -64.474485968))
            ThreePointArc((-11.368591443, -64.474485968), (-16.944652234, -63.238303052), (-22.391753989, -61.520838466))
            Line((-22.391753989, -61.520838466), (-23.477667944, -64.504362537))
            ThreePointArc((-23.477667944, -64.504362537), (-17.766402702, -66.305117551), (-11.919924408, -67.601250584))
        make_face()
        with BuildLine():
            ThreePointArc((22.391753989, -61.520838466), (16.944652234, -63.238303052), (11.368591443, -64.474485968))
            Line((11.368591443, -64.474485968), (11.919924408, -67.601250584))
            ThreePointArc((11.919924408, -67.601250584), (17.766402702, -66.305117551), (23.477667944, -64.504362537))
            Line((23.477667944, -64.504362537), (22.391753989, -61.520838466))
        make_face()
    extrude(amount=BOSS_EXTRUDE11_DEPTH)


solid = part.part
